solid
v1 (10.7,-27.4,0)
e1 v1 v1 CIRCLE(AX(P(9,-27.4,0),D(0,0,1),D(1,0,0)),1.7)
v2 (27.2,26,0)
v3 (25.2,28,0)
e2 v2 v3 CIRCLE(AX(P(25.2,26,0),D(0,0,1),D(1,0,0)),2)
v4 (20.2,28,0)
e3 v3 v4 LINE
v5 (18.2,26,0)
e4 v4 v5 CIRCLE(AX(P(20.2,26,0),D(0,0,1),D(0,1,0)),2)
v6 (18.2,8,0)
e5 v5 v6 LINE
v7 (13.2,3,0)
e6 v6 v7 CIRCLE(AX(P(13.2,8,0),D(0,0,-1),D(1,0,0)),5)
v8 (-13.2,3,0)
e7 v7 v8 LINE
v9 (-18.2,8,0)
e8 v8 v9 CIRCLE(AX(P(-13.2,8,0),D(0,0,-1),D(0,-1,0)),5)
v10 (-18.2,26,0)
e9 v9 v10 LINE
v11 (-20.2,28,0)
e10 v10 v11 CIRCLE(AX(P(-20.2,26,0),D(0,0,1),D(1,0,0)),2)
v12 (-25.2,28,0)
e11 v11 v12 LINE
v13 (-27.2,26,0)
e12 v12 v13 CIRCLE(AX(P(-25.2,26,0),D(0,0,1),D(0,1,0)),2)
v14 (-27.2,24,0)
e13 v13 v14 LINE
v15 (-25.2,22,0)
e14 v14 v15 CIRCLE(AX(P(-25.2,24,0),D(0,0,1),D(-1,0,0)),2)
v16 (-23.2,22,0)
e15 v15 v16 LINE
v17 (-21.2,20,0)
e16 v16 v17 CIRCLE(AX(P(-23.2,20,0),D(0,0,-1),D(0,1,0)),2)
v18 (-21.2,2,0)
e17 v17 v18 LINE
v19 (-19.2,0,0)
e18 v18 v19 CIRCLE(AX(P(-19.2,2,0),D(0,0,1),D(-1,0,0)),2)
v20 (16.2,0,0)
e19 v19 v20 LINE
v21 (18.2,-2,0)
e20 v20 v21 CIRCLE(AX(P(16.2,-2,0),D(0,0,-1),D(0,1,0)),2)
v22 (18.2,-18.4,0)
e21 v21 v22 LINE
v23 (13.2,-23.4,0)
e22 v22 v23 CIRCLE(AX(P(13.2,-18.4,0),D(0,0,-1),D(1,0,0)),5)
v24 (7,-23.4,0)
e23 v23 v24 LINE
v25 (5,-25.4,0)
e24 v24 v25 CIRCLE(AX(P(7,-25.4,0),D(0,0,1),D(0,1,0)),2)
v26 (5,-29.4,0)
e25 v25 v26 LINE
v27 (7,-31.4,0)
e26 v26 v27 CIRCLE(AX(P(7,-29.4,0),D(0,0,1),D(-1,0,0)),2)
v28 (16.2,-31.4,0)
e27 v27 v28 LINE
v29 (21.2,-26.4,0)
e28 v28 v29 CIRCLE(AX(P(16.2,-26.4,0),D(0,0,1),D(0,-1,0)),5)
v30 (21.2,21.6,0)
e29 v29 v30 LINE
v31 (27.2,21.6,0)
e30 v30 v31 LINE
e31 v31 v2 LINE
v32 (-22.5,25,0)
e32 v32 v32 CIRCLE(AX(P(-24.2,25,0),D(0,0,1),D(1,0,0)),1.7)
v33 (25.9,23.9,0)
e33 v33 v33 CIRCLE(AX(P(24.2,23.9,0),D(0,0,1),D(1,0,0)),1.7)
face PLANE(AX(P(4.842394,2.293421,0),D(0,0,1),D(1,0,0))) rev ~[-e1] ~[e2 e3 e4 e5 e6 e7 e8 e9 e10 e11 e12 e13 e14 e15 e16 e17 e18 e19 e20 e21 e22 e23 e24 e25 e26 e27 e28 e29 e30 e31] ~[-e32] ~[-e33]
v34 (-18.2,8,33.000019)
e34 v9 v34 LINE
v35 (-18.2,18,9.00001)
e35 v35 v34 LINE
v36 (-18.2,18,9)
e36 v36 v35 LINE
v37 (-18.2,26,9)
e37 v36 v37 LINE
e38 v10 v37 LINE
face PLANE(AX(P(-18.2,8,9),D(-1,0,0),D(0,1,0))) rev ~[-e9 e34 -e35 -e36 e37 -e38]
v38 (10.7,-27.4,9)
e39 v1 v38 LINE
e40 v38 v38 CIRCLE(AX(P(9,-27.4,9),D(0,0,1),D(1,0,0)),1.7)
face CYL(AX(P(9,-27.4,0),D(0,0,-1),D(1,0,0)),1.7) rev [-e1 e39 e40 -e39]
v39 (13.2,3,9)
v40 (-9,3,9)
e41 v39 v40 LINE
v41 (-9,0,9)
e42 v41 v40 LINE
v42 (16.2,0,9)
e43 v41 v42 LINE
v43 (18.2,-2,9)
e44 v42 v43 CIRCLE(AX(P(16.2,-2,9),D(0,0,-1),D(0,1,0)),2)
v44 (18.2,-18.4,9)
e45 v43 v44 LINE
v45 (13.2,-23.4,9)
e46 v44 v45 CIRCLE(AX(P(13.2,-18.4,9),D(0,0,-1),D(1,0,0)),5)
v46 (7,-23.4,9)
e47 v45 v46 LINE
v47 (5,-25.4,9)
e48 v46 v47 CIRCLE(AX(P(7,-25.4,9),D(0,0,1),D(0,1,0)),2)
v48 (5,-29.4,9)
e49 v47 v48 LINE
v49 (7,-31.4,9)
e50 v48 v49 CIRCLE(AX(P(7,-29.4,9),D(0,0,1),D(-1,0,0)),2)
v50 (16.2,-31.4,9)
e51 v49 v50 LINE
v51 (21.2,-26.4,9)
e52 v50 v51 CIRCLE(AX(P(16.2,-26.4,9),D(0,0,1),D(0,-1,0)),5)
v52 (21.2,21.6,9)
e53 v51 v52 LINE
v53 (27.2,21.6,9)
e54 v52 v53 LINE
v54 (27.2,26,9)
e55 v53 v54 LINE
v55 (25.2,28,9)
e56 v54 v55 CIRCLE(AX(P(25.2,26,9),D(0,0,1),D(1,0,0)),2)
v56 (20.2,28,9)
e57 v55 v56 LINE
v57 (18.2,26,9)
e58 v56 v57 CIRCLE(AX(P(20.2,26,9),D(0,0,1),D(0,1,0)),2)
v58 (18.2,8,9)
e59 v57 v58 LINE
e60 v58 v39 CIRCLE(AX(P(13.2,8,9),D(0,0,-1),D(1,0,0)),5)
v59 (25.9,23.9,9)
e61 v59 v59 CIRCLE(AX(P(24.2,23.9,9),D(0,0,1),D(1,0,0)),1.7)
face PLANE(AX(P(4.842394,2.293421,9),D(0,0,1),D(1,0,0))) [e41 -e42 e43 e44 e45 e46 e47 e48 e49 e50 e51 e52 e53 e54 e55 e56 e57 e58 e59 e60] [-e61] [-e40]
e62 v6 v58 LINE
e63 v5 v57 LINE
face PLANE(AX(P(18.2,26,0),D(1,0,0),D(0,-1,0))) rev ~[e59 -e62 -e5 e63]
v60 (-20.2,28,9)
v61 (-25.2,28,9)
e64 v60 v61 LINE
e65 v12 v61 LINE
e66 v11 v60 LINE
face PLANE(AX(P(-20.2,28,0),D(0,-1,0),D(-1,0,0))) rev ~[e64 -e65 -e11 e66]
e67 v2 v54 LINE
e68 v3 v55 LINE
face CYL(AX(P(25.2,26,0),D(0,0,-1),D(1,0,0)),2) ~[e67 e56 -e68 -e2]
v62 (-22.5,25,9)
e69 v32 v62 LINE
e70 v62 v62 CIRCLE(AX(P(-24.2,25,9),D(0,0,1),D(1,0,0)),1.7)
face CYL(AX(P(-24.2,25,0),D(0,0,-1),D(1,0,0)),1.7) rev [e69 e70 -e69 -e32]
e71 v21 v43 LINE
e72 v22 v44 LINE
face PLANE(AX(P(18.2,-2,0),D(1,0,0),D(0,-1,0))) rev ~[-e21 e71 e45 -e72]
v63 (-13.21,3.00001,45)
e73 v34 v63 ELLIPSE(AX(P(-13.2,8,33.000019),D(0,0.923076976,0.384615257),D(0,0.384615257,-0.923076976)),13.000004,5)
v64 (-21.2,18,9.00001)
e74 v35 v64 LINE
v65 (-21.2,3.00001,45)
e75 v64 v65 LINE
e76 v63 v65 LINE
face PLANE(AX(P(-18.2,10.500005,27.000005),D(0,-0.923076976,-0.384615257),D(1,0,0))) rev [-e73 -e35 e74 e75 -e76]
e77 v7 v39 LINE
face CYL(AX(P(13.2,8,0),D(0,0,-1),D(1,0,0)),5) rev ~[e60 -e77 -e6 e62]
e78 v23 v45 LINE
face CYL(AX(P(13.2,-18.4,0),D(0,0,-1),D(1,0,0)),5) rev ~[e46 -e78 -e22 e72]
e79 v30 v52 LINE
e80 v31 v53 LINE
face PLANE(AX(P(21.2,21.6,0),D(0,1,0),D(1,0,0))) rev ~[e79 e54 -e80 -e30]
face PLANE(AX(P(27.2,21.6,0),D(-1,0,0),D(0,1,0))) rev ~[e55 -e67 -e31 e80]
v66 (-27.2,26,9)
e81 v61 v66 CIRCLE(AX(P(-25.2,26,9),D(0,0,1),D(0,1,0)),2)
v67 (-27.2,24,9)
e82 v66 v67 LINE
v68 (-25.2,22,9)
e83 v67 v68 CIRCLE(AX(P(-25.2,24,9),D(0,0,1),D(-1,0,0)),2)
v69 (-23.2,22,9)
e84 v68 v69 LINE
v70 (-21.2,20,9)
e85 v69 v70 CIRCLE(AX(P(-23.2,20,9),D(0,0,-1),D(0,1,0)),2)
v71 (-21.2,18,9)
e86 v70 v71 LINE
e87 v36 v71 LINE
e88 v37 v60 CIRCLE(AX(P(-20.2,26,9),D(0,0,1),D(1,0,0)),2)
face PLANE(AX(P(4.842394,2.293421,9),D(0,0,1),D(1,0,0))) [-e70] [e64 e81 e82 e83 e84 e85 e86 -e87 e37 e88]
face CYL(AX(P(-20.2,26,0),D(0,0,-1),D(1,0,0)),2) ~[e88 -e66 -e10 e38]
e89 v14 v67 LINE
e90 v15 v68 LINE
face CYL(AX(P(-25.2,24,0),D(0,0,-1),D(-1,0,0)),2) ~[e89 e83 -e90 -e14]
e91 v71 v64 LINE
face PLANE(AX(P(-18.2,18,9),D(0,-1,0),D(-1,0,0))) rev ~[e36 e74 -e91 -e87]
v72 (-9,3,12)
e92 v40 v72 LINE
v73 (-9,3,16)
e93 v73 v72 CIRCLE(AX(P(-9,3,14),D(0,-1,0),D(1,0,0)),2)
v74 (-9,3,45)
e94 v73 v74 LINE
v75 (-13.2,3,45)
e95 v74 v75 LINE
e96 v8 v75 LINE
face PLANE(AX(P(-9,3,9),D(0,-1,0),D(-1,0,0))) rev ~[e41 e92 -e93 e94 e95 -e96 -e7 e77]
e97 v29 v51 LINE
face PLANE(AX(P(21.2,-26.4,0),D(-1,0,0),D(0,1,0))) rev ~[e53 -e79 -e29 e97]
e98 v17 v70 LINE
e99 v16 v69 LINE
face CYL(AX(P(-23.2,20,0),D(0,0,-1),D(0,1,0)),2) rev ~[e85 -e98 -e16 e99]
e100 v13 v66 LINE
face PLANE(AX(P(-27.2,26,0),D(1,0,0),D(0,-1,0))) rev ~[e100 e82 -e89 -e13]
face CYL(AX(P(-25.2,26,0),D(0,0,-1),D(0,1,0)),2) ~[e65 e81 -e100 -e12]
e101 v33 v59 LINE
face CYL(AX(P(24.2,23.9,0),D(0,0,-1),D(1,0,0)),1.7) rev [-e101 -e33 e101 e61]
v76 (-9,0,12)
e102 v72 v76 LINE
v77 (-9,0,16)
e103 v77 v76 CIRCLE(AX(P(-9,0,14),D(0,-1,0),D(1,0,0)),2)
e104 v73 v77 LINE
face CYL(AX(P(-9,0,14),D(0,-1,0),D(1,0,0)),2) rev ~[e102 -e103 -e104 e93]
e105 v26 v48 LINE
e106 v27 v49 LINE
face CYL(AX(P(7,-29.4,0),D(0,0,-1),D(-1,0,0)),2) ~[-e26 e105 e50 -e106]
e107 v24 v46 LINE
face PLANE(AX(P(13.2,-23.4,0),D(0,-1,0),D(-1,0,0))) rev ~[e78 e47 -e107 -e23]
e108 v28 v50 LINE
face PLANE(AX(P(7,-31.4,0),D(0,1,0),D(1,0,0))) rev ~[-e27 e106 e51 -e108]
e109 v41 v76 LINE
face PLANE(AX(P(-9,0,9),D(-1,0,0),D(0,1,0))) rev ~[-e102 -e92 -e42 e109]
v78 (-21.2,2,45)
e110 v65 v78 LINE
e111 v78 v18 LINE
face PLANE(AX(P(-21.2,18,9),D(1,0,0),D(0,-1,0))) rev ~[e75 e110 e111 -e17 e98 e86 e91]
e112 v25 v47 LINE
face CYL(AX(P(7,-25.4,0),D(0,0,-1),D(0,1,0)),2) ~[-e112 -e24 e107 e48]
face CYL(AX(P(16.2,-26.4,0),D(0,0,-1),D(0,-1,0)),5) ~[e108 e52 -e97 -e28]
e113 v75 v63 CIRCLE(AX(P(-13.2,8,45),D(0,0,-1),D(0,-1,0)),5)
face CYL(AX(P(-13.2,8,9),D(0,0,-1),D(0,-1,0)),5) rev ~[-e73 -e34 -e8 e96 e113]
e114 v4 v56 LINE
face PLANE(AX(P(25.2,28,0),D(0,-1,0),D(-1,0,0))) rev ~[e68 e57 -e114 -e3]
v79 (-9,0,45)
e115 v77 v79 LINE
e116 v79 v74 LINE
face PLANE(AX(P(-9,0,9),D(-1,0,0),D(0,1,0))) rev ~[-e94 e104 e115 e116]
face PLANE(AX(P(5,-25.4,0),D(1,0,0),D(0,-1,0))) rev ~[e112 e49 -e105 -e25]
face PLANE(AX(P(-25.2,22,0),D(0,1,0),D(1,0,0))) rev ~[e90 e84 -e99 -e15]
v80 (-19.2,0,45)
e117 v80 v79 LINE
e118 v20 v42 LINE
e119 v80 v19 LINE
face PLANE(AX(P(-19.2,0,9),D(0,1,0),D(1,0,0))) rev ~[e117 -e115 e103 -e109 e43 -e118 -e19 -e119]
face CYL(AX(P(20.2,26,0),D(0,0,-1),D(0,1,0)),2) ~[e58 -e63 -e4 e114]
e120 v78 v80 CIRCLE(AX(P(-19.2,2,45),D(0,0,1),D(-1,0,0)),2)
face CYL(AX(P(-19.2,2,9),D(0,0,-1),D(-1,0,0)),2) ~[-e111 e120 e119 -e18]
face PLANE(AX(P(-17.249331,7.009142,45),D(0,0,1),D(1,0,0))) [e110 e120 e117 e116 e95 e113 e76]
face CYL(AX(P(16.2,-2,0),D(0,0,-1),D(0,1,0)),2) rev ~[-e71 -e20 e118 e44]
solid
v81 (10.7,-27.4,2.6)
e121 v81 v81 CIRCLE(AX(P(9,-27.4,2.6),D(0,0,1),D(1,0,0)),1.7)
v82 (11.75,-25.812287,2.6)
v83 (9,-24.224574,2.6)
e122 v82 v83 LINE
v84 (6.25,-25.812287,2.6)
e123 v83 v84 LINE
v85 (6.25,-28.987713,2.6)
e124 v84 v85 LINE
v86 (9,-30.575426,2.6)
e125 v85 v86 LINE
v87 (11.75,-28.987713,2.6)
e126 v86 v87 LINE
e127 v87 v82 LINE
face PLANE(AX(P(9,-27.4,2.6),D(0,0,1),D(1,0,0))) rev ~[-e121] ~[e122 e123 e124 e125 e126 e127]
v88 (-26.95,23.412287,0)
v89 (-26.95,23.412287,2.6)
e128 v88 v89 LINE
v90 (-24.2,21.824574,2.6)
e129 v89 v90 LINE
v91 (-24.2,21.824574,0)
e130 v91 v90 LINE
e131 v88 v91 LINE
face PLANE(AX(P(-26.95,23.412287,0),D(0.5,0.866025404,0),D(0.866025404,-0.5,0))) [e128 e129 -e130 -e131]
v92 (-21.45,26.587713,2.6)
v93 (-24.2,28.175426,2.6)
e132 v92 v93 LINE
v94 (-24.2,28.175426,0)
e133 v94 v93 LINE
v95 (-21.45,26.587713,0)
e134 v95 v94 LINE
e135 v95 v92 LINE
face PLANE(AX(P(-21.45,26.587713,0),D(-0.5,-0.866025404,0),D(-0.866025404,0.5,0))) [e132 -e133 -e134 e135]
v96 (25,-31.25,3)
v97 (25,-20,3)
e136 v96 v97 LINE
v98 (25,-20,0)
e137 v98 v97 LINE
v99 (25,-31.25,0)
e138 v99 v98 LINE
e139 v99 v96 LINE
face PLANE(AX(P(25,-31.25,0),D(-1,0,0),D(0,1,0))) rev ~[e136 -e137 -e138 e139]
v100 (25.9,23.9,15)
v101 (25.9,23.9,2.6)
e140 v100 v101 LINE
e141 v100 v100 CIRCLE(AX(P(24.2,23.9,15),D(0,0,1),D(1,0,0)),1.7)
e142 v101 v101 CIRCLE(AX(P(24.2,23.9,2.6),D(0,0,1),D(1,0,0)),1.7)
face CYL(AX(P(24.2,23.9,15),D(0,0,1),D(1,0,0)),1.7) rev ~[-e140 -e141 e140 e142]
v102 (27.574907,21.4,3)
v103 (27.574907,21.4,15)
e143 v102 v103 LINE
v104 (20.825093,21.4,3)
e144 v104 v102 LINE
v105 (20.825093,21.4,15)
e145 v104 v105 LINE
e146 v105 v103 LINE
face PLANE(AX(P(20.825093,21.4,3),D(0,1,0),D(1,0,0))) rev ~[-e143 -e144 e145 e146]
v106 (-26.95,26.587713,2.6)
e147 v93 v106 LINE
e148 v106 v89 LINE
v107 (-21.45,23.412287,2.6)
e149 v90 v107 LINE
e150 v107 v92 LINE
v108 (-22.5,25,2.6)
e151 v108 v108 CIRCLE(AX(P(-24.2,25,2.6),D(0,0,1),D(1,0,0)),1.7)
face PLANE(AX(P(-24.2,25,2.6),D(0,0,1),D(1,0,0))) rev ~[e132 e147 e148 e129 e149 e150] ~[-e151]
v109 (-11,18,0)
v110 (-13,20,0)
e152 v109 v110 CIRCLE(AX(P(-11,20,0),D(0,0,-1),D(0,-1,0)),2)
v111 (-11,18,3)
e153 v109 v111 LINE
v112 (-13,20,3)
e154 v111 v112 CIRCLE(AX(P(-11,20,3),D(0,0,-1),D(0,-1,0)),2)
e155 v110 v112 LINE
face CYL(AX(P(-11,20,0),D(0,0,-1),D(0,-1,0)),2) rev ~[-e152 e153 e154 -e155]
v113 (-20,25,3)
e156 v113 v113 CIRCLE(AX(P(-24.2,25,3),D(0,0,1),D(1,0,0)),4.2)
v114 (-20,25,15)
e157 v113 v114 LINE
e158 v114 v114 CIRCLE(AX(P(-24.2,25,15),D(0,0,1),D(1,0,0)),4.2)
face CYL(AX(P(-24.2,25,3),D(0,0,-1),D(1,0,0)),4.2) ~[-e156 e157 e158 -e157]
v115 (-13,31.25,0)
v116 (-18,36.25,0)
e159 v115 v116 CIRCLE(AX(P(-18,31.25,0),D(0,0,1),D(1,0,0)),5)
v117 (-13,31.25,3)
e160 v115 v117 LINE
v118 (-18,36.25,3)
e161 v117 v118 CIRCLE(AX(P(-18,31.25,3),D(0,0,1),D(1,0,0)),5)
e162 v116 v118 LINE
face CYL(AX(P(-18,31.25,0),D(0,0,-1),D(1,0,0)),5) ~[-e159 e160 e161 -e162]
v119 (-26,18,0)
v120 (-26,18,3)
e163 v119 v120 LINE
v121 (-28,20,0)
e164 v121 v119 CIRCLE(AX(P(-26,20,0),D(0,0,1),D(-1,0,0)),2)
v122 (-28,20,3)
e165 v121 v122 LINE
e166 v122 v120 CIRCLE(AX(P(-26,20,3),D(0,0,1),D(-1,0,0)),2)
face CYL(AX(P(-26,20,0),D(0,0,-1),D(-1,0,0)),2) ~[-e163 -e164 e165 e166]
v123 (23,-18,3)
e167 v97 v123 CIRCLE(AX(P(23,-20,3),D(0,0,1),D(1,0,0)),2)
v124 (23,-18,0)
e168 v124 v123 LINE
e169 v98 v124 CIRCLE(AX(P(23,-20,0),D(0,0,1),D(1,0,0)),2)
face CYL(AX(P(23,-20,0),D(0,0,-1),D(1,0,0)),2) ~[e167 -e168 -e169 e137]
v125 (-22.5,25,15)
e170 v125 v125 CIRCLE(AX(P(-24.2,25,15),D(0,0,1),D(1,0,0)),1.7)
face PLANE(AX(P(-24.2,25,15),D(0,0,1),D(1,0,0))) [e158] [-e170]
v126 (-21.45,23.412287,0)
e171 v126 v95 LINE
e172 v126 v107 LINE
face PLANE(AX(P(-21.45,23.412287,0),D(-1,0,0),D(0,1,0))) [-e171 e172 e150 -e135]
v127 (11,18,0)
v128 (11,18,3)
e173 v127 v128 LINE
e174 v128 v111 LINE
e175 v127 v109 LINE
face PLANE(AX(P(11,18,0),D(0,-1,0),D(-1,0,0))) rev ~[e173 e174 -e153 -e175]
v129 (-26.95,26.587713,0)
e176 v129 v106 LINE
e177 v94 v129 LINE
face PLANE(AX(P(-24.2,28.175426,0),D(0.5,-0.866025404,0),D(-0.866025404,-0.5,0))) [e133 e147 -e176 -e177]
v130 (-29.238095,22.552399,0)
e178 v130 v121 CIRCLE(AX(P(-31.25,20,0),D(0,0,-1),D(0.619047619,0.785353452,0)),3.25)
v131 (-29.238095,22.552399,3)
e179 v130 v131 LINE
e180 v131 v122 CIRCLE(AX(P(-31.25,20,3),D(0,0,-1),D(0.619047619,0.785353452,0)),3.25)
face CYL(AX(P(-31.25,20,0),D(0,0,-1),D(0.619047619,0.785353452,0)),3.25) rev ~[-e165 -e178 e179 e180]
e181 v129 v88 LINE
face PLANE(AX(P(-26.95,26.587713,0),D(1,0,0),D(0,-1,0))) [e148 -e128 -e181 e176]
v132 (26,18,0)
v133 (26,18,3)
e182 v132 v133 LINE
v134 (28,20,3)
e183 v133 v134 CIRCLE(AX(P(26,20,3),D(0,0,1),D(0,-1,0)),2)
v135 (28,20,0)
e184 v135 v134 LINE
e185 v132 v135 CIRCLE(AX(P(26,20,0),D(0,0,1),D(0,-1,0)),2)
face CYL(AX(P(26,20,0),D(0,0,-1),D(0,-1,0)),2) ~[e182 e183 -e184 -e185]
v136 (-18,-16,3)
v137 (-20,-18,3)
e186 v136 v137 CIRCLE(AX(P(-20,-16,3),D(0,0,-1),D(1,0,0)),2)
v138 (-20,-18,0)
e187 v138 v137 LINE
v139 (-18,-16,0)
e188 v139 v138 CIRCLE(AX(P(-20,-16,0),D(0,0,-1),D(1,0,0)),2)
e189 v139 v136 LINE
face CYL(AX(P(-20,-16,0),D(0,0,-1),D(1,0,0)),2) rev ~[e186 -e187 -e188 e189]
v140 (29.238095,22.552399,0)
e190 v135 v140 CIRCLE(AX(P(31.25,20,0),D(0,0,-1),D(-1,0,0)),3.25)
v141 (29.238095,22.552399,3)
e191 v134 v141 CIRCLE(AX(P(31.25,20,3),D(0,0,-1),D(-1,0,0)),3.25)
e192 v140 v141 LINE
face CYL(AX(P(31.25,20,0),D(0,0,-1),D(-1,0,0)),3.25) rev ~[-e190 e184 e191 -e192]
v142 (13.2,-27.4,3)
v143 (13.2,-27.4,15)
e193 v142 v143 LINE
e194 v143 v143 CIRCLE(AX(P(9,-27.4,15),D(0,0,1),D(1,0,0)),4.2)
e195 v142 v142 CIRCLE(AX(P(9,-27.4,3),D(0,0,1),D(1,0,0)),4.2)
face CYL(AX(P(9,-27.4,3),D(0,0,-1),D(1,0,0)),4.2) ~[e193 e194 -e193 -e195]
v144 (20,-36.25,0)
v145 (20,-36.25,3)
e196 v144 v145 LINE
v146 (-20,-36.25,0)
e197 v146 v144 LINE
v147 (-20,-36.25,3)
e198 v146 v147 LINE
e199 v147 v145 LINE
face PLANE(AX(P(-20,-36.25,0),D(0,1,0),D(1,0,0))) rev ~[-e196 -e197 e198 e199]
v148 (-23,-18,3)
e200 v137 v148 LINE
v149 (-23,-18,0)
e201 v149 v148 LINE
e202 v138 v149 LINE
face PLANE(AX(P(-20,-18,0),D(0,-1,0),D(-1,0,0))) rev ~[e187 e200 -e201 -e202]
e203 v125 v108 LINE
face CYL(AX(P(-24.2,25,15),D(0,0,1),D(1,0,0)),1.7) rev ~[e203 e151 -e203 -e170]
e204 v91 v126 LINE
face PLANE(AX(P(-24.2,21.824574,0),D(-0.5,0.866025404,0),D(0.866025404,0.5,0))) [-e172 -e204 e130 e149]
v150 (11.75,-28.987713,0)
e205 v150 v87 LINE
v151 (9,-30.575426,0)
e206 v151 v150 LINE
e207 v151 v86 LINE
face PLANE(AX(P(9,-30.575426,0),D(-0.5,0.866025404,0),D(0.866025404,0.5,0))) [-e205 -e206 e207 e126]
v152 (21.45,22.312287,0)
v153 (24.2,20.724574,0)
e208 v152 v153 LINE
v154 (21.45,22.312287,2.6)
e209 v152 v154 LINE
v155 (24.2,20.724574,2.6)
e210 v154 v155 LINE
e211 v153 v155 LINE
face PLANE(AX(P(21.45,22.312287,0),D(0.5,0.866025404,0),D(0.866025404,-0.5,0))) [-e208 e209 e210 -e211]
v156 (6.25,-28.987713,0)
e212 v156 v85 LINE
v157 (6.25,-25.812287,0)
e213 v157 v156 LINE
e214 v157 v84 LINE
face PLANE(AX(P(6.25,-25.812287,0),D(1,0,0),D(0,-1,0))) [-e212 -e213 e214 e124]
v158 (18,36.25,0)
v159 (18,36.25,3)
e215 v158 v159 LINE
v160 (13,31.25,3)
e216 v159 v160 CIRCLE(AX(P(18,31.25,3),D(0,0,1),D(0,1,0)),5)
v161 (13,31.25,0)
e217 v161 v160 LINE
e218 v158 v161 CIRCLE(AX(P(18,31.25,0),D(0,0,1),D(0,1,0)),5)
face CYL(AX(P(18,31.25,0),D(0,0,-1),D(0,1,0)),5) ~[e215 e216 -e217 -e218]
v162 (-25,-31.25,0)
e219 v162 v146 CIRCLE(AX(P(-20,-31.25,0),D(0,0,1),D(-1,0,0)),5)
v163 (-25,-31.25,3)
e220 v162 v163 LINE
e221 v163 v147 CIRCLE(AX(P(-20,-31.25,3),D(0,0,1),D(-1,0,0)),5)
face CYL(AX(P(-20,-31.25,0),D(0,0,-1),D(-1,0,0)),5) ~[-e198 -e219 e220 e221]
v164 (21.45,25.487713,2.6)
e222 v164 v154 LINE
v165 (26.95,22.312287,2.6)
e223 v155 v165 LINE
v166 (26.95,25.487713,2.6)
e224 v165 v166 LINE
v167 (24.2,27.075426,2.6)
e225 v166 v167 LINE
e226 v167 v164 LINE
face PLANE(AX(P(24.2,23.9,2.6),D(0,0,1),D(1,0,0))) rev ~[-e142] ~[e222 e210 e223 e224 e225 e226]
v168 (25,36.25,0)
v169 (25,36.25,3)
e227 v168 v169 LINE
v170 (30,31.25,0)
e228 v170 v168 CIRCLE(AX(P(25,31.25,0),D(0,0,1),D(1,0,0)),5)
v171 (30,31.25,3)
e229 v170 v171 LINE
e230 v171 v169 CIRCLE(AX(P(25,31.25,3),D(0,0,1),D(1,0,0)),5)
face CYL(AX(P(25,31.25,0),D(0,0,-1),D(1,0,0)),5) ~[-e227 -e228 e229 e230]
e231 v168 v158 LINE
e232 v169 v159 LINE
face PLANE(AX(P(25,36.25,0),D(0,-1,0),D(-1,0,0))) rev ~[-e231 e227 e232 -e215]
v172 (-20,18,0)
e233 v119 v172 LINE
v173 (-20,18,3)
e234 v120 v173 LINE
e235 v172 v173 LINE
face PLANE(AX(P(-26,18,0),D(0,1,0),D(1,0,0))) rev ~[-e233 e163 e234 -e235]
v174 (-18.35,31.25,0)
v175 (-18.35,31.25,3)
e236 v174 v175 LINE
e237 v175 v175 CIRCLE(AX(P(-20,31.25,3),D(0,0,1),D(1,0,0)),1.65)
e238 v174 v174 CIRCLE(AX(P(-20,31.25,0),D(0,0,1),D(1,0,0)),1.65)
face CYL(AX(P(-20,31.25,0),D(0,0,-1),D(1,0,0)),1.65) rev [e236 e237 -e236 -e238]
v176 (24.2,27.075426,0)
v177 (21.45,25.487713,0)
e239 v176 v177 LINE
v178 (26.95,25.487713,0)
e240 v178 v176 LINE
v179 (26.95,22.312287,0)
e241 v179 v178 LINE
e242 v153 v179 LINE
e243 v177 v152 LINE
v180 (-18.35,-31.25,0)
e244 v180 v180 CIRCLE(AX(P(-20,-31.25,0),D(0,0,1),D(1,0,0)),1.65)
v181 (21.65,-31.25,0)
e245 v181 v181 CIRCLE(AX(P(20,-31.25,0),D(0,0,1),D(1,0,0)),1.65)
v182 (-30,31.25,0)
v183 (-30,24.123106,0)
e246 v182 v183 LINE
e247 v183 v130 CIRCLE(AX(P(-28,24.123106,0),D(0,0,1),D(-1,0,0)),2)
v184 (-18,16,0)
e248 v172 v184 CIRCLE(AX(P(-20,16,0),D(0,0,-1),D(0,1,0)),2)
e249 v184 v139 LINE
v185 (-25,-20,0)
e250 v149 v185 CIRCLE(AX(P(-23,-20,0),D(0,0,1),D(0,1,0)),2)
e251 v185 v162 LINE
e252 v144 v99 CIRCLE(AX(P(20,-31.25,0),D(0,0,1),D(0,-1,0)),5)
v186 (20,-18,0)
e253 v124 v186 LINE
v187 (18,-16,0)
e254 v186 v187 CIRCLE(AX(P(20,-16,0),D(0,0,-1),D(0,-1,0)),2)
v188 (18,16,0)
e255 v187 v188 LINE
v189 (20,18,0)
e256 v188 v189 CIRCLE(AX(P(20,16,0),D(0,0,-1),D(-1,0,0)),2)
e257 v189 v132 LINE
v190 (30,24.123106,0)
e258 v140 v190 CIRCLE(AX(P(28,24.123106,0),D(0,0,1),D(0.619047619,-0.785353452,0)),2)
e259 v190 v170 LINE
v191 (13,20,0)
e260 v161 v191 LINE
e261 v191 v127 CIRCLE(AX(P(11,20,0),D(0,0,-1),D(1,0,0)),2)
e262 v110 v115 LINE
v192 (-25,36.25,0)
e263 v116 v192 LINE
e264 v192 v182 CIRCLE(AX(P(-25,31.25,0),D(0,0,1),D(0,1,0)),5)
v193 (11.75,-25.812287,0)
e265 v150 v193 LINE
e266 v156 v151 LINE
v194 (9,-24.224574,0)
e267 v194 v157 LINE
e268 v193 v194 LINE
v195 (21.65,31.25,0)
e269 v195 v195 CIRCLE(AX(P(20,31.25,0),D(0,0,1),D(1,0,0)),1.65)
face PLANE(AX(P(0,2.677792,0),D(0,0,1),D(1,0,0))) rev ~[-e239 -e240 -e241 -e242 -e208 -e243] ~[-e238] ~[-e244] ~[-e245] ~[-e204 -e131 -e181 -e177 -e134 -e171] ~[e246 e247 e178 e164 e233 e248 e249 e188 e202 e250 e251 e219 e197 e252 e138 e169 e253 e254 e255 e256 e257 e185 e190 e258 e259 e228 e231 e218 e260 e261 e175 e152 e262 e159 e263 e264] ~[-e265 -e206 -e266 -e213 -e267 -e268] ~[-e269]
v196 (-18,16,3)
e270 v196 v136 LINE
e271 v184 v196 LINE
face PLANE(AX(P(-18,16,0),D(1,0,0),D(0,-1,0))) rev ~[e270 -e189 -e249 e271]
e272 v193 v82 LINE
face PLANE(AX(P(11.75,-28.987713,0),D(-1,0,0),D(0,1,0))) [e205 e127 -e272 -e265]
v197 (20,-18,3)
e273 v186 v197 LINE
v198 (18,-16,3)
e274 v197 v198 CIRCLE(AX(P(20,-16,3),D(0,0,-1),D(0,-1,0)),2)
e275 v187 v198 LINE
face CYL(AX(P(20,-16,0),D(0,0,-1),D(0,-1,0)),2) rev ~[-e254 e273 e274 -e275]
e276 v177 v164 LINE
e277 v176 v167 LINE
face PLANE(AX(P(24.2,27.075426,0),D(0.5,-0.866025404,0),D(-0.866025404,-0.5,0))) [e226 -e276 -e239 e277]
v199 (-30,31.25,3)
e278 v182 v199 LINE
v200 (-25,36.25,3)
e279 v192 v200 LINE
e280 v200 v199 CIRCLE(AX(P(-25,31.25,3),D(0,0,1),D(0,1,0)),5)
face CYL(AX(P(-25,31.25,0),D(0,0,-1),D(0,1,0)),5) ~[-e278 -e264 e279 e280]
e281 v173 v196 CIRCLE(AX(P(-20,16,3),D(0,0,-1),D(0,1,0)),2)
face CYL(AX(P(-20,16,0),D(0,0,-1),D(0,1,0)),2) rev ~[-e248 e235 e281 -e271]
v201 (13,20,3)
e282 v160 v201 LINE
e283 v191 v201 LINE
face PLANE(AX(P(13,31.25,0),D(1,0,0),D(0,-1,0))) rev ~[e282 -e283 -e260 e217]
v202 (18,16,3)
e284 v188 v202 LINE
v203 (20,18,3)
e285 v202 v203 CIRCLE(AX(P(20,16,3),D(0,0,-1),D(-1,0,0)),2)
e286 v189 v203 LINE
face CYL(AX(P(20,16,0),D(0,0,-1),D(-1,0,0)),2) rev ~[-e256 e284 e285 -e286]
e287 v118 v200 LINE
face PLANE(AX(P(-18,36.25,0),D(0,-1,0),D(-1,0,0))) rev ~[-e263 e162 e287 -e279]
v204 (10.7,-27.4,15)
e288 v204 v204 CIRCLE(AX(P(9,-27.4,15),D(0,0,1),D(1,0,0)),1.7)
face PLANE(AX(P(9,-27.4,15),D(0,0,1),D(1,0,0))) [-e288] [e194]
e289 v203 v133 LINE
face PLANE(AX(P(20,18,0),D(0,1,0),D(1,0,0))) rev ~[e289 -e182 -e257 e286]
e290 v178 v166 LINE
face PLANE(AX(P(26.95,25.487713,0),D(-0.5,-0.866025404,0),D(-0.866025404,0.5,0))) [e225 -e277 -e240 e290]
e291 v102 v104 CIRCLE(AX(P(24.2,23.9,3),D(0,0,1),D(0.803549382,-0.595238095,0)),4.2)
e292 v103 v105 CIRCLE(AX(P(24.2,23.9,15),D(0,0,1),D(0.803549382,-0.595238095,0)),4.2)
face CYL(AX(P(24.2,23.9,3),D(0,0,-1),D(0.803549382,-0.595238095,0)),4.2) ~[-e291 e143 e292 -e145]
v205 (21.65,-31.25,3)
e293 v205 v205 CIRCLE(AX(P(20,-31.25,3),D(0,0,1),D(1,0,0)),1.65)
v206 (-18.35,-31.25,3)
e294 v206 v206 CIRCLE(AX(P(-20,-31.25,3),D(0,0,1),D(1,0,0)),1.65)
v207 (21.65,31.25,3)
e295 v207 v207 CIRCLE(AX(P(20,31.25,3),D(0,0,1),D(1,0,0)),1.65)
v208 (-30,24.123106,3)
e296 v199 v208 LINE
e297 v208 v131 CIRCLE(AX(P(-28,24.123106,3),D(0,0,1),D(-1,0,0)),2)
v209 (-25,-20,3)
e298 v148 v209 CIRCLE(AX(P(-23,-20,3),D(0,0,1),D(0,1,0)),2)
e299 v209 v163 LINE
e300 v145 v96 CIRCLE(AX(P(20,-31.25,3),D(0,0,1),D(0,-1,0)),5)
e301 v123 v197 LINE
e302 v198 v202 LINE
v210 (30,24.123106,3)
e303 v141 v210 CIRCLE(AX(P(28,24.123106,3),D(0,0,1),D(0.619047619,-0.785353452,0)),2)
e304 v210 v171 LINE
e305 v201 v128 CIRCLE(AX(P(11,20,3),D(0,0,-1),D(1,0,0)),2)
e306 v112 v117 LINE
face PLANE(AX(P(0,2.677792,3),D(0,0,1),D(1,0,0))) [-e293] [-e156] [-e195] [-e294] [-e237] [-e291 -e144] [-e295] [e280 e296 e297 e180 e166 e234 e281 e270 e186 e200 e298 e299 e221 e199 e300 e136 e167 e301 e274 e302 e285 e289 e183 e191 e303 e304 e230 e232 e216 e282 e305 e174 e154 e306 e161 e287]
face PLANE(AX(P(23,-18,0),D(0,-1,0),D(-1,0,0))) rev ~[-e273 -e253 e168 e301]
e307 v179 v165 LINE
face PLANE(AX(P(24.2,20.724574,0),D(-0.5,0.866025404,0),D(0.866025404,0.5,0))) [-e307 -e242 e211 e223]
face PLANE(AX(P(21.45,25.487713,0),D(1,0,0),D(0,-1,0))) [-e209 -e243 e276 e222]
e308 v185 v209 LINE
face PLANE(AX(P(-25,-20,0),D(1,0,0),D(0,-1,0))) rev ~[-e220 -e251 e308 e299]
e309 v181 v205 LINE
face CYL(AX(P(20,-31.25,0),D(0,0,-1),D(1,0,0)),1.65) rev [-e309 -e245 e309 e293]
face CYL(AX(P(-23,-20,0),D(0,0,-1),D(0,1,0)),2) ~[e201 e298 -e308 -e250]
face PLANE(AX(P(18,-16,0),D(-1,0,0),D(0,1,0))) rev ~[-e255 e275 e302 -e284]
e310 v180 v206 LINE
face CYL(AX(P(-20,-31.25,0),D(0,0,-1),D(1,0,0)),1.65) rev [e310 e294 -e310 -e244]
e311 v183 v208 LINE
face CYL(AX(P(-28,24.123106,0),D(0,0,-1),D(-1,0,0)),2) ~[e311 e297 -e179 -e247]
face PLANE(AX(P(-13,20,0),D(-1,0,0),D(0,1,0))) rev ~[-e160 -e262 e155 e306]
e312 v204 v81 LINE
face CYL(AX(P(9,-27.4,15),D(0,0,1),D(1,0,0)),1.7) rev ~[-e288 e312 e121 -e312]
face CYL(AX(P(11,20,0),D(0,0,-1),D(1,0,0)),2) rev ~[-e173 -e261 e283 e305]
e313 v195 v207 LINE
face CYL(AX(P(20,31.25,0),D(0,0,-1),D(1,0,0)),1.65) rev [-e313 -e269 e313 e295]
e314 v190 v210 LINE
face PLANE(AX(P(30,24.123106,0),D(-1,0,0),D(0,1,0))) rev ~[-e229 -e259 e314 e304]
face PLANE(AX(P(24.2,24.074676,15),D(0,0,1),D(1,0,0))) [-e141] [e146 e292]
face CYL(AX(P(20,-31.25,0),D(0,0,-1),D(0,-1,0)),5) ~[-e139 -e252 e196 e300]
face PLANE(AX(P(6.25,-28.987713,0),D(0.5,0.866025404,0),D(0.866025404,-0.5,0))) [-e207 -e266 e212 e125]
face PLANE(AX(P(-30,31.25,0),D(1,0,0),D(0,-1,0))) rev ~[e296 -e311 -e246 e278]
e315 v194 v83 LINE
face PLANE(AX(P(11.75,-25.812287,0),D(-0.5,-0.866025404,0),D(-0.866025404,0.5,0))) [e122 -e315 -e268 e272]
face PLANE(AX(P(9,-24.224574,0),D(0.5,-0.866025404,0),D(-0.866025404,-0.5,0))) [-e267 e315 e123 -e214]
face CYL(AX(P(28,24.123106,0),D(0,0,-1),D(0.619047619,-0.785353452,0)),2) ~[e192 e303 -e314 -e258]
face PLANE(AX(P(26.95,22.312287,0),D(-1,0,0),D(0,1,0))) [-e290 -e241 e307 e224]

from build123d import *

# Parameters (mm, degrees)
F1_R      = 1.65
F2_DEPTH  = 3
F3_R      = 4.2
F4_DEPTH  = 12
F5_R      = 1.7
F6_DEPTH  = 15.001
F0_R      = 1.7
F7_DEPTH  = 2.6
F8_R      = 1.7
F9_DEPTH  = 9
F11_DEPTH = 36
F12_R     = 2
F13_DEPTH = 36.2510003725
F14_SIZE2 = 14.99999
F14_SIZE  = 35.99999


# Not quite as in the source:
# - a fillet or chamfer is up to 0.001 mm smaller than in the source, because OpenCascade refuses the exact size


with BuildPart() as f2:
    # F1 (on Top) → F2 (new body)
    with BuildSketch(Plane.XY):
        with BuildLine():
            Line((-25.0000003725, -20), (-25.0000003725, -31.2500003725))
            ThreePointArc((-25.0000003725, -31.2500003725), (-23.5355342785, -34.7855342785), (-20.0000003725, -36.2500003725))
            Line((-20.0000003725, -36.2500003725), (20.0000003725, -36.2500003725))
            ThreePointArc((20.0000003725, -36.2500003725), (23.5355342785, -34.7855342785), (25.0000003725, -31.2500003725))
            Line((25.0000003725, -31.2500003725), (25.0000003725, -20))
            ThreePointArc((25.0000003725, -20), (24.4142139349, -18.5857864376), (23.0000003725, -18))
            Line((23.0000003725, -18), (20, -18))
            ThreePointArc((20, -18), (18.5857864376, -17.4142135624), (18, -16))
            Line((18, -16), (18, 16))
            ThreePointArc((18, 16), (18.5857864376, 17.4142135624), (20, 18))
            Line((20, 18), (26, 18))
            ThreePointArc((26, 18), (27.4142135624, 18.5857864376), (28, 20))
            ThreePointArc((28, 20), (28.3258599148, 21.4184162865), (29.2380952381, 22.5523987206))
            ThreePointArc((29.2380952381, 22.5523987206), (29.7994708217, 23.2502340647), (30, 24.1231056256))
            Line((30, 24.1231056256), (30, 31.2500003725))
            ThreePointArc((30, 31.2500003725), (28.5355339059, 34.7855342785), (25, 36.2500003725))
            Line((25, 36.2500003725), (18, 36.2500003725))
            ThreePointArc((18, 36.2500003725), (14.4644660941, 34.7855342785), (13, 31.2500003725))
            Line((13, 31.2500003725), (13, 20))
            ThreePointArc((13, 20), (12.4142135624, 18.5857864376), (11, 18))
            Line((11, 18), (-11, 18))
            ThreePointArc((-11, 18), (-12.4142135624, 18.5857864376), (-13, 20))
            Line((-13, 20), (-13, 31.2500003725))
            ThreePointArc((-13, 31.2500003725), (-14.4644660941, 34.7855342785), (-18, 36.2500003725))
            Line((-18, 36.2500003725), (-20.0000003725, 36.2500003725))
            Line((-20.0000003725, 36.2500003725), (-25, 36.2500003725))
            ThreePointArc((-25, 36.2500003725), (-28.5355339059, 34.7855342785), (-30, 31.2500003725))
            Line((-30, 31.2500003725), (-30, 24.1231056256))
            ThreePointArc((-30, 24.1231056256), (-29.7994708217, 23.2502340647), (-29.2380952381, 22.5523987206))
            ThreePointArc((-29.2380952381, 22.5523987206), (-28.3258599148, 21.4184162865), (-28, 20))
            ThreePointArc((-28, 20), (-27.4142135624, 18.5857864376), (-26, 18))
            Line((-26, 18), (-20, 18))
            ThreePointArc((-20, 18), (-18.5857864376, 17.4142135624), (-18, 16))
            Line((-18, 16), (-18, -16))
            ThreePointArc((-18, -16), (-18.5857864376, -17.4142135624), (-20, -18))
            Line((-20, -18), (-23.0000003725, -18))
            ThreePointArc((-23.0000003725, -18), (-24.4142139349, -18.5857864376), (-25.0000003725, -20))
        make_face()
        with Locations((-20, -31.25)):
            Circle(F1_R, mode=Mode.SUBTRACT)
        with Locations((20, -31.25)):
            Circle(F1_R, mode=Mode.SUBTRACT)
        with Locations((-20, 31.25)):
            Circle(F1_R, mode=Mode.SUBTRACT)
        with Locations((20, 31.25)):
            Circle(F1_R, mode=Mode.SUBTRACT)
    extrude(amount=F2_DEPTH)

    # F3 (on face) → F4 (join)
    with BuildSketch(Plane.XY.offset(3)):
        with BuildLine():
            Line((20.8250925939, 21.4), (27.5749074061, 21.4))
            ThreePointArc((27.5749074061, 21.4), (24.2, 28.1), (20.8250925939, 21.4))
        make_face()
        with Locations((9, -27.4)):
            Circle(F3_R)
        with Locations((-24.2, 25)):
            Circle(F3_R)
    extrude(amount=F4_DEPTH)

    # F5 (on face) → F6 (cut, through all)
    with BuildSketch(Plane.XY.offset(15)):
        with Locations((-24.2, 25)):
            Circle(F5_R)
        with Locations((24.2, 23.9)):
            Circle(F5_R)
        with Locations((9, -27.4)):
            Circle(F5_R)
    extrude(amount=-F6_DEPTH, mode=Mode.SUBTRACT)

    # F0 (on Top) → F7 (cut)
    with BuildSketch(Plane.XY):
        Polygon((-26.95, 26.5877132403), (-26.95, 23.4122867597), (-24.2, 21.8245735195), (-21.45, 23.4122867597), (-21.45, 26.5877132403), (-24.2, 28.1754264805), align=None)
        with Locations((-24.2, 25)):
            Circle(F0_R, mode=Mode.SUBTRACT)
        Polygon((26.95, 22.3122867597), (26.95, 25.4877132403), (24.2, 27.0754264805), (21.45, 25.4877132403), (21.45, 22.3122867597), (24.2, 20.7245735195), align=None)
        with Locations((24.2, 23.9)):
            Circle(F0_R, mode=Mode.SUBTRACT)
        Polygon((11.75, -28.9877132403), (11.75, -25.8122867597), (9, -24.2245735195), (6.25, -25.8122867597), (6.25, -28.9877132403), (9, -30.5754264805), align=None)
        with Locations((9, -27.4)):
            Circle(F0_R, mode=Mode.SUBTRACT)
    extrude(amount=F7_DEPTH, mode=Mode.SUBTRACT)


with BuildPart() as f9:
    # F8 (on Top) → F9 (new body)
    with BuildSketch(Plane.XY):
        with BuildLine():
            ThreePointArc((-21.2, 2), (-20.6142135624, 0.5857864376), (-19.2, 0))
            Line((-19.2, 0), (16.2, 0))
            ThreePointArc((16.2, 0), (17.6142135624, -0.5857864376), (18.2, -2))
            Line((18.2, -2), (18.2, -18.4))
            ThreePointArc((18.2, -18.4), (16.7355339059, -21.9355339059), (13.2, -23.4))
            Line((13.2, -23.4), (7, -23.4))
            ThreePointArc((7, -23.4), (5.5857864376, -23.9857864376), (5, -25.4))
            Line((5, -25.4), (5, -29.4))
            ThreePointArc((5, -29.4), (5.5857864376, -30.8142135624), (7, -31.4))
            Line((7, -31.4), (16.2, -31.4))
            ThreePointArc((16.2, -31.4), (19.7355339059, -29.9355339059), (21.2, -26.4))
            Line((21.2, -26.4), (21.2, 21.6))
            Line((21.2, 21.6), (27.2, 21.6))
            Line((27.2, 21.6), (27.2, 26))
            ThreePointArc((27.2, 26), (26.6142135624, 27.4142135624), (25.2, 28))
            Line((25.2, 28), (20.2, 28))
            ThreePointArc((20.2, 28), (18.7857864376, 27.4142135624), (18.2, 26))
            Line((18.2, 26), (18.2, 8))
            ThreePointArc((18.2, 8), (16.7355339059, 4.4644660941), (13.2, 3))
            Line((13.2, 3), (-13.2, 3))
            ThreePointArc((-13.2, 3), (-16.7355339059, 4.4644660941), (-18.2, 8))
            Line((-18.2, 8), (-18.2, 18.8116944134))
            Line((-18.2, 18.8116944134), (-18.2, 26))
            ThreePointArc((-18.2, 26), (-18.7857864376, 27.4142135624), (-20.2, 28))
            Line((-20.2, 28), (-25.2, 28))
            ThreePointArc((-25.2, 28), (-26.6142135624, 27.4142135624), (-27.2, 26))
            Line((-27.2, 26), (-27.2, 24))
            ThreePointArc((-27.2, 24), (-26.6142135624, 22.5857864376), (-25.2, 22))
            Line((-25.2, 22), (-23.2, 22))
            ThreePointArc((-23.2, 22), (-21.7857864376, 21.4142135624), (-21.2, 20))
            Line((-21.2, 20), (-21.2, 2))
        make_face()
        with Locations((9, -27.4)):
            Circle(F8_R, mode=Mode.SUBTRACT)
        with Locations((-24.2, 25)):
            Circle(F8_R, mode=Mode.SUBTRACT)
        with Locations((24.2, 23.9)):
            Circle(F8_R, mode=Mode.SUBTRACT)
    extrude(amount=F9_DEPTH)

    # F10 (on face) → F11 (join)
    with BuildSketch(Plane.XY.offset(9)):
        with BuildLine():
            Line((-9, 0), (-9, 3))
            Line((-9, 3), (-13.2, 3))
            ThreePointArc((-13.2, 3), (-16.7355339059, 4.4644660941), (-18.2, 8))
            Line((-18.2, 8), (-18.2, 18))
            Line((-18.2, 18), (-21.2, 18))
            Line((-21.2, 18), (-21.2, 2))
            ThreePointArc((-21.2, 2), (-20.6142135624, 0.5857864376), (-19.2, 0))
            Line((-19.2, 0), (-9, 0))
        make_face()
    extrude(amount=F11_DEPTH)

    # F12 (on face) → F13 (cut, through all)
    with BuildSketch(Plane.XZ):
        with Locations((-9, 14)):
            Circle(F12_R)
    extrude(amount=-F13_DEPTH, mode=Mode.SUBTRACT)

    # F14 (size 36 and 15 in the source; OpenCascade refuses exactly that, so slightly less here)
    f14_edges = [f9.edges().sort_by_distance(p)[0] for p in [
        (-19.7, 18, 45),
    ]]
    f14_side = f9.faces().sort_by_distance((-19.7, 18, 27))[0]
    chamfer(f14_edges, length=F14_SIZE, length2=F14_SIZE2, reference=f14_side)


solid = Compound([f2.part, f9.part])
